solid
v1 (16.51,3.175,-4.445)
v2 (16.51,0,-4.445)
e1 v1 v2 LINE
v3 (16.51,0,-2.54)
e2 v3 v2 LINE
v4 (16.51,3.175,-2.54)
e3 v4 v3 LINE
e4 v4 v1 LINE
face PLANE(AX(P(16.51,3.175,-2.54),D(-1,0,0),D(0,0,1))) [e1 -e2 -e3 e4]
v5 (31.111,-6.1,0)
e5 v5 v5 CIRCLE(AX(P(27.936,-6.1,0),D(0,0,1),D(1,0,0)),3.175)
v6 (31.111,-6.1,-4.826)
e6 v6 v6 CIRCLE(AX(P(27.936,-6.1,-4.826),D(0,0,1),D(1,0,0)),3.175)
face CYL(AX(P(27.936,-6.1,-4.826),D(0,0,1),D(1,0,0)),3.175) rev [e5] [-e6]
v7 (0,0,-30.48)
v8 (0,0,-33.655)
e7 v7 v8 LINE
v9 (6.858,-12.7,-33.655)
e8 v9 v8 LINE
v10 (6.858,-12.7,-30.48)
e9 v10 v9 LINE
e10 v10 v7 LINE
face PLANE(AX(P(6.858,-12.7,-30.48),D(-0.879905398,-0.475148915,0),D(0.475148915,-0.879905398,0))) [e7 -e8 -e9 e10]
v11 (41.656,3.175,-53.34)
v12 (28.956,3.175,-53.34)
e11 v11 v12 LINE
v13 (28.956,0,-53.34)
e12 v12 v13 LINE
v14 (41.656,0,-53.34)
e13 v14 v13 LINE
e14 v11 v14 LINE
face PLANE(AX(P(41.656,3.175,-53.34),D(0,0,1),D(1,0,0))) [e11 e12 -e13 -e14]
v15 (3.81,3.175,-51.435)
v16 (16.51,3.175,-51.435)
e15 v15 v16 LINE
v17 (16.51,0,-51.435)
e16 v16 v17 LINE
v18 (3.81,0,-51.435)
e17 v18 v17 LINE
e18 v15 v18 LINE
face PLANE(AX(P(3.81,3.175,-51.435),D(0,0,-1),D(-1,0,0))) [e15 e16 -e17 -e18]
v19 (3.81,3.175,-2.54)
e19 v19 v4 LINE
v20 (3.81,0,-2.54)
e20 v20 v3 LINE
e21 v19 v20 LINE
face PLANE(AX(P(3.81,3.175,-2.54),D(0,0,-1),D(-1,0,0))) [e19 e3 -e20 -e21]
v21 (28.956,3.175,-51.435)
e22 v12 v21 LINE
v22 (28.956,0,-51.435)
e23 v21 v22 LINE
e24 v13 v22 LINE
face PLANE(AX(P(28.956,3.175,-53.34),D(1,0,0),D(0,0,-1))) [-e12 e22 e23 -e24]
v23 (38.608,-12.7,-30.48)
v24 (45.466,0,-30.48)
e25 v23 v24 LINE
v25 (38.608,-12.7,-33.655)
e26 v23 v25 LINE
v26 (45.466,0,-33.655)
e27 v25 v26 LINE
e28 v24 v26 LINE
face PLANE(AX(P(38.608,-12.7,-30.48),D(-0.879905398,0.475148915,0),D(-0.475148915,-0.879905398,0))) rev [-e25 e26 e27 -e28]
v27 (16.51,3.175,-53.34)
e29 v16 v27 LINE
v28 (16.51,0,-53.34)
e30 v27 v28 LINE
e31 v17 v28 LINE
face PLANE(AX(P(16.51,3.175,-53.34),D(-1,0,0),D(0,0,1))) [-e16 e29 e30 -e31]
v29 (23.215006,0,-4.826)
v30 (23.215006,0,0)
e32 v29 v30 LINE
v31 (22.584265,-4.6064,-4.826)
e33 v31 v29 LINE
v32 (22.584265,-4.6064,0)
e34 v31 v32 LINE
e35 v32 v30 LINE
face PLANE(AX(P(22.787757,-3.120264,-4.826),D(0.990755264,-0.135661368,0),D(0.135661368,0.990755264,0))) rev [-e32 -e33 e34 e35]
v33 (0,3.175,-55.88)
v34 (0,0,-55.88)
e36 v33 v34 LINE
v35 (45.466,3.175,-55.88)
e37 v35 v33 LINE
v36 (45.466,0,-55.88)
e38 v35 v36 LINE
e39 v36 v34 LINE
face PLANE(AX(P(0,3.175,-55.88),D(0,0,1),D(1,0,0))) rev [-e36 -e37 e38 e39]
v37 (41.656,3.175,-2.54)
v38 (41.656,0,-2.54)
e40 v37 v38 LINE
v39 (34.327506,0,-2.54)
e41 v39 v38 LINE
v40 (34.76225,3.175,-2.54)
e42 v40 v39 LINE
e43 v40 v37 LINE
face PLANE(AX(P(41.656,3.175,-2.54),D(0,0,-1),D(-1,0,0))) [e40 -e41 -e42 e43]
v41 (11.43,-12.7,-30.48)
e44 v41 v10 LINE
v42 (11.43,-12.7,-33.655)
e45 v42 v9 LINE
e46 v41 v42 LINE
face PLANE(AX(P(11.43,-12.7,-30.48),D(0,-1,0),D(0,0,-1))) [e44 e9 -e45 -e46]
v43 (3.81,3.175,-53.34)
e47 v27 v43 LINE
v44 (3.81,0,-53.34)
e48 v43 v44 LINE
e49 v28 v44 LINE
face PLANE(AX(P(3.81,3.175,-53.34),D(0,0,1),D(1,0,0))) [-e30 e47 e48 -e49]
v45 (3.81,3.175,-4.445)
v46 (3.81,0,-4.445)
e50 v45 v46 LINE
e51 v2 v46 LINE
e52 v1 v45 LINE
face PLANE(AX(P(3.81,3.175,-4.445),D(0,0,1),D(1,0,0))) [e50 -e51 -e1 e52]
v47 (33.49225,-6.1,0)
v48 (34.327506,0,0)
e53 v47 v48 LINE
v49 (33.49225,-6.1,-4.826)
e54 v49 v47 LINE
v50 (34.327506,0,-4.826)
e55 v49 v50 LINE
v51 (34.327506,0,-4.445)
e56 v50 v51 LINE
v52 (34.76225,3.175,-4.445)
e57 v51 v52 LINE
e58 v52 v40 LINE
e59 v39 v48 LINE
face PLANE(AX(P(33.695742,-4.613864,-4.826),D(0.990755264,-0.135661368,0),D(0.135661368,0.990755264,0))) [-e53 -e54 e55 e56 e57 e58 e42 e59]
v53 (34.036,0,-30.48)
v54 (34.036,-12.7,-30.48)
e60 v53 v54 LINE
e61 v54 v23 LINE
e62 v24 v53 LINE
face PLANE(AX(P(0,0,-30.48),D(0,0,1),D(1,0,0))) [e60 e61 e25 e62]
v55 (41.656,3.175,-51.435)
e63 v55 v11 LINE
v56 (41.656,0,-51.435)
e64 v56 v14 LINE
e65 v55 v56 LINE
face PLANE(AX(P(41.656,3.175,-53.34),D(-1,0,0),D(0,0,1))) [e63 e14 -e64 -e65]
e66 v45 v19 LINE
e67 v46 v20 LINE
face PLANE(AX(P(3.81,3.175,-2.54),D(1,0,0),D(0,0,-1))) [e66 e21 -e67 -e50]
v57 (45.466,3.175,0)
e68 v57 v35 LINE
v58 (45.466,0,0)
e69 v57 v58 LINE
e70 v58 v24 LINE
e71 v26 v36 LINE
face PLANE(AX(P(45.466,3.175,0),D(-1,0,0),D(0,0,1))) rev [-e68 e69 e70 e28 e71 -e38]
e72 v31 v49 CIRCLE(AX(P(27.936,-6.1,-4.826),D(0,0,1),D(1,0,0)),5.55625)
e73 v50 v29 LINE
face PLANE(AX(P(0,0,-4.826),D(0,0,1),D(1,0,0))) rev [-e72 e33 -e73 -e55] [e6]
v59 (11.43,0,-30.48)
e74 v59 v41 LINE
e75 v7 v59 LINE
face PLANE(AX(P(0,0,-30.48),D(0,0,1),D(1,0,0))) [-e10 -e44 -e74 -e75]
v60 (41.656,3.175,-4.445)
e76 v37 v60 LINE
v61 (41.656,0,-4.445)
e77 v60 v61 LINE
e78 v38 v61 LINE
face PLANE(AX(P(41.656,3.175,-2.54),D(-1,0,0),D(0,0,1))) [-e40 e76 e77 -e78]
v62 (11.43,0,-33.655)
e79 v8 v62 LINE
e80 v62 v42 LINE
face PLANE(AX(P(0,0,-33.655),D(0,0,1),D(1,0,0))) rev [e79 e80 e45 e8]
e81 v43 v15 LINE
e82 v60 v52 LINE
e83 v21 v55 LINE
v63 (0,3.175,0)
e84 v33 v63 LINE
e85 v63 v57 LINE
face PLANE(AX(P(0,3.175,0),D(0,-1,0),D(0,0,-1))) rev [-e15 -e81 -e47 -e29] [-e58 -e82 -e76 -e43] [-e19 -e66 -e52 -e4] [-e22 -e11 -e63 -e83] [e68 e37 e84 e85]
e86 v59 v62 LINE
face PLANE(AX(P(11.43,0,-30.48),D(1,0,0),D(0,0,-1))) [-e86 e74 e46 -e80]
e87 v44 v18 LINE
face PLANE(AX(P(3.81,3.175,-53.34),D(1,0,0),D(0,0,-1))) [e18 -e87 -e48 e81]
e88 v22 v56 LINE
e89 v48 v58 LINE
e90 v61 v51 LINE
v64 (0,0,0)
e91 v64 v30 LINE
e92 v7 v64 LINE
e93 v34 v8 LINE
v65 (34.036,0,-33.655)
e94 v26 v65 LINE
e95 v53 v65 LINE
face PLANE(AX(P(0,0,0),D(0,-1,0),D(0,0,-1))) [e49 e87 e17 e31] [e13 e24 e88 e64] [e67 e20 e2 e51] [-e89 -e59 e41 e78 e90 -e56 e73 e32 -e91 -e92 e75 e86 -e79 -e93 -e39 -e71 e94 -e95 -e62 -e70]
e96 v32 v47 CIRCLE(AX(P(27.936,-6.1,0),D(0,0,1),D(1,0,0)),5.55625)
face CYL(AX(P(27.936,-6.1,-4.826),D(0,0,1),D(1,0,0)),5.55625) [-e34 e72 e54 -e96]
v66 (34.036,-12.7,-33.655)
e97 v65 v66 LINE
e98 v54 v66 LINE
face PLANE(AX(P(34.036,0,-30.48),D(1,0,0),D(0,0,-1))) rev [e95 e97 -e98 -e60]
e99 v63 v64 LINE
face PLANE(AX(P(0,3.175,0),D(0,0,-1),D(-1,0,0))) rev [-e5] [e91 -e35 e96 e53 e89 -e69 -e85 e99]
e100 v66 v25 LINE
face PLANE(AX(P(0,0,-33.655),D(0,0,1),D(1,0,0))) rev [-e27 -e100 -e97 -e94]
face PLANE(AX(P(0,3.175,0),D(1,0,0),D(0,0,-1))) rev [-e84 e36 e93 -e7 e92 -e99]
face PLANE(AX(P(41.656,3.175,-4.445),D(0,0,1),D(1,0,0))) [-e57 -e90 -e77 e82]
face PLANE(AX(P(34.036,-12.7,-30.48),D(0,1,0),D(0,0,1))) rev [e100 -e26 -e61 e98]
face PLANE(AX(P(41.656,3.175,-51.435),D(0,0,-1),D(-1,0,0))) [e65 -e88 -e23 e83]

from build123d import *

# Parameters (mm, degrees)
SKETCH1_W               = 45.466
SKETCH1_H               = 55.88
SKETCH1_W_2             = 12.7
SKETCH1_H_2             = 1.905
BOSS_EXTRUDE1_DEPTH     = 3.175
BOSS_EXTRUDE2_DEPTH     = 3.175
BOSS_EXTRUDE3_START     = -4.826
BOSS_EXTRUDE3_OUTLINE_R = 3.175
BOSS_EXTRUDE3_DEPTH     = 4.826


# Read off the part's stored shape, not the designer's step: Boss-Extrude3
with BuildPart() as part:
    # Sketch1 → Boss-Extrude1 (new body)
    with BuildSketch(Plane(origin=(0, 0, 0), x_dir=(1, 0, 0), z_dir=(0, 1, 0))):
        with Locations((22.733, 27.94)):
            Rectangle(SKETCH1_W, SKETCH1_H)
        with Locations((35.306, 52.3875)):
            Rectangle(SKETCH1_W_2, SKETCH1_H_2, mode=Mode.SUBTRACT)
        with Locations((10.16, 52.3875)):
            Rectangle(SKETCH1_W_2, SKETCH1_H_2, mode=Mode.SUBTRACT)
        with Locations((35.306, 3.4925)):
            Rectangle(SKETCH1_W_2, SKETCH1_H_2, mode=Mode.SUBTRACT)
        with Locations((10.16, 3.4925)):
            Rectangle(SKETCH1_W_2, SKETCH1_H_2, mode=Mode.SUBTRACT)
    extrude(amount=BOSS_EXTRUDE1_DEPTH)

    # 3DSketch2 → Boss-Extrude2 (add)
    with BuildSketch(Plane(origin=(34.036, 0, -30.48), x_dir=(-1, 0, 0), z_dir=(0, 0, 1))):
        Polygon((0, 0), (0, 12.7), (-4.572, 12.7), (-11.43, 0), align=None)
        Polygon((22.606, 0), (22.606, 12.7), (27.178, 12.7), (34.036, 0), align=None)
    extrude(amount=-BOSS_EXTRUDE2_DEPTH)

    # Boss-Extrude3 outline → Boss-Extrude3 (add)
    with BuildSketch(Plane.XY.offset(BOSS_EXTRUDE3_START)):
        with BuildLine():
            Line((23.215006065, 0), (22.584264524, -4.606399832))
            ThreePointArc((22.584264524, -4.606399832), (27.182231525, -11.604883936), (33.49225, -6.1))
            Line((33.49225, -6.1), (34.76225, 3.175))
            Line((34.76225, 3.175), (28.956, 3.175))
            Line((28.956, 3.175), (28.956, 0))
            Line((28.956, 0), (23.215006065, 0))
        make_face()
        with Locations((27.936, -6.1)):
            Circle(BOSS_EXTRUDE3_OUTLINE_R, mode=Mode.SUBTRACT)
    extrude(amount=BOSS_EXTRUDE3_DEPTH)


solid = part.part
